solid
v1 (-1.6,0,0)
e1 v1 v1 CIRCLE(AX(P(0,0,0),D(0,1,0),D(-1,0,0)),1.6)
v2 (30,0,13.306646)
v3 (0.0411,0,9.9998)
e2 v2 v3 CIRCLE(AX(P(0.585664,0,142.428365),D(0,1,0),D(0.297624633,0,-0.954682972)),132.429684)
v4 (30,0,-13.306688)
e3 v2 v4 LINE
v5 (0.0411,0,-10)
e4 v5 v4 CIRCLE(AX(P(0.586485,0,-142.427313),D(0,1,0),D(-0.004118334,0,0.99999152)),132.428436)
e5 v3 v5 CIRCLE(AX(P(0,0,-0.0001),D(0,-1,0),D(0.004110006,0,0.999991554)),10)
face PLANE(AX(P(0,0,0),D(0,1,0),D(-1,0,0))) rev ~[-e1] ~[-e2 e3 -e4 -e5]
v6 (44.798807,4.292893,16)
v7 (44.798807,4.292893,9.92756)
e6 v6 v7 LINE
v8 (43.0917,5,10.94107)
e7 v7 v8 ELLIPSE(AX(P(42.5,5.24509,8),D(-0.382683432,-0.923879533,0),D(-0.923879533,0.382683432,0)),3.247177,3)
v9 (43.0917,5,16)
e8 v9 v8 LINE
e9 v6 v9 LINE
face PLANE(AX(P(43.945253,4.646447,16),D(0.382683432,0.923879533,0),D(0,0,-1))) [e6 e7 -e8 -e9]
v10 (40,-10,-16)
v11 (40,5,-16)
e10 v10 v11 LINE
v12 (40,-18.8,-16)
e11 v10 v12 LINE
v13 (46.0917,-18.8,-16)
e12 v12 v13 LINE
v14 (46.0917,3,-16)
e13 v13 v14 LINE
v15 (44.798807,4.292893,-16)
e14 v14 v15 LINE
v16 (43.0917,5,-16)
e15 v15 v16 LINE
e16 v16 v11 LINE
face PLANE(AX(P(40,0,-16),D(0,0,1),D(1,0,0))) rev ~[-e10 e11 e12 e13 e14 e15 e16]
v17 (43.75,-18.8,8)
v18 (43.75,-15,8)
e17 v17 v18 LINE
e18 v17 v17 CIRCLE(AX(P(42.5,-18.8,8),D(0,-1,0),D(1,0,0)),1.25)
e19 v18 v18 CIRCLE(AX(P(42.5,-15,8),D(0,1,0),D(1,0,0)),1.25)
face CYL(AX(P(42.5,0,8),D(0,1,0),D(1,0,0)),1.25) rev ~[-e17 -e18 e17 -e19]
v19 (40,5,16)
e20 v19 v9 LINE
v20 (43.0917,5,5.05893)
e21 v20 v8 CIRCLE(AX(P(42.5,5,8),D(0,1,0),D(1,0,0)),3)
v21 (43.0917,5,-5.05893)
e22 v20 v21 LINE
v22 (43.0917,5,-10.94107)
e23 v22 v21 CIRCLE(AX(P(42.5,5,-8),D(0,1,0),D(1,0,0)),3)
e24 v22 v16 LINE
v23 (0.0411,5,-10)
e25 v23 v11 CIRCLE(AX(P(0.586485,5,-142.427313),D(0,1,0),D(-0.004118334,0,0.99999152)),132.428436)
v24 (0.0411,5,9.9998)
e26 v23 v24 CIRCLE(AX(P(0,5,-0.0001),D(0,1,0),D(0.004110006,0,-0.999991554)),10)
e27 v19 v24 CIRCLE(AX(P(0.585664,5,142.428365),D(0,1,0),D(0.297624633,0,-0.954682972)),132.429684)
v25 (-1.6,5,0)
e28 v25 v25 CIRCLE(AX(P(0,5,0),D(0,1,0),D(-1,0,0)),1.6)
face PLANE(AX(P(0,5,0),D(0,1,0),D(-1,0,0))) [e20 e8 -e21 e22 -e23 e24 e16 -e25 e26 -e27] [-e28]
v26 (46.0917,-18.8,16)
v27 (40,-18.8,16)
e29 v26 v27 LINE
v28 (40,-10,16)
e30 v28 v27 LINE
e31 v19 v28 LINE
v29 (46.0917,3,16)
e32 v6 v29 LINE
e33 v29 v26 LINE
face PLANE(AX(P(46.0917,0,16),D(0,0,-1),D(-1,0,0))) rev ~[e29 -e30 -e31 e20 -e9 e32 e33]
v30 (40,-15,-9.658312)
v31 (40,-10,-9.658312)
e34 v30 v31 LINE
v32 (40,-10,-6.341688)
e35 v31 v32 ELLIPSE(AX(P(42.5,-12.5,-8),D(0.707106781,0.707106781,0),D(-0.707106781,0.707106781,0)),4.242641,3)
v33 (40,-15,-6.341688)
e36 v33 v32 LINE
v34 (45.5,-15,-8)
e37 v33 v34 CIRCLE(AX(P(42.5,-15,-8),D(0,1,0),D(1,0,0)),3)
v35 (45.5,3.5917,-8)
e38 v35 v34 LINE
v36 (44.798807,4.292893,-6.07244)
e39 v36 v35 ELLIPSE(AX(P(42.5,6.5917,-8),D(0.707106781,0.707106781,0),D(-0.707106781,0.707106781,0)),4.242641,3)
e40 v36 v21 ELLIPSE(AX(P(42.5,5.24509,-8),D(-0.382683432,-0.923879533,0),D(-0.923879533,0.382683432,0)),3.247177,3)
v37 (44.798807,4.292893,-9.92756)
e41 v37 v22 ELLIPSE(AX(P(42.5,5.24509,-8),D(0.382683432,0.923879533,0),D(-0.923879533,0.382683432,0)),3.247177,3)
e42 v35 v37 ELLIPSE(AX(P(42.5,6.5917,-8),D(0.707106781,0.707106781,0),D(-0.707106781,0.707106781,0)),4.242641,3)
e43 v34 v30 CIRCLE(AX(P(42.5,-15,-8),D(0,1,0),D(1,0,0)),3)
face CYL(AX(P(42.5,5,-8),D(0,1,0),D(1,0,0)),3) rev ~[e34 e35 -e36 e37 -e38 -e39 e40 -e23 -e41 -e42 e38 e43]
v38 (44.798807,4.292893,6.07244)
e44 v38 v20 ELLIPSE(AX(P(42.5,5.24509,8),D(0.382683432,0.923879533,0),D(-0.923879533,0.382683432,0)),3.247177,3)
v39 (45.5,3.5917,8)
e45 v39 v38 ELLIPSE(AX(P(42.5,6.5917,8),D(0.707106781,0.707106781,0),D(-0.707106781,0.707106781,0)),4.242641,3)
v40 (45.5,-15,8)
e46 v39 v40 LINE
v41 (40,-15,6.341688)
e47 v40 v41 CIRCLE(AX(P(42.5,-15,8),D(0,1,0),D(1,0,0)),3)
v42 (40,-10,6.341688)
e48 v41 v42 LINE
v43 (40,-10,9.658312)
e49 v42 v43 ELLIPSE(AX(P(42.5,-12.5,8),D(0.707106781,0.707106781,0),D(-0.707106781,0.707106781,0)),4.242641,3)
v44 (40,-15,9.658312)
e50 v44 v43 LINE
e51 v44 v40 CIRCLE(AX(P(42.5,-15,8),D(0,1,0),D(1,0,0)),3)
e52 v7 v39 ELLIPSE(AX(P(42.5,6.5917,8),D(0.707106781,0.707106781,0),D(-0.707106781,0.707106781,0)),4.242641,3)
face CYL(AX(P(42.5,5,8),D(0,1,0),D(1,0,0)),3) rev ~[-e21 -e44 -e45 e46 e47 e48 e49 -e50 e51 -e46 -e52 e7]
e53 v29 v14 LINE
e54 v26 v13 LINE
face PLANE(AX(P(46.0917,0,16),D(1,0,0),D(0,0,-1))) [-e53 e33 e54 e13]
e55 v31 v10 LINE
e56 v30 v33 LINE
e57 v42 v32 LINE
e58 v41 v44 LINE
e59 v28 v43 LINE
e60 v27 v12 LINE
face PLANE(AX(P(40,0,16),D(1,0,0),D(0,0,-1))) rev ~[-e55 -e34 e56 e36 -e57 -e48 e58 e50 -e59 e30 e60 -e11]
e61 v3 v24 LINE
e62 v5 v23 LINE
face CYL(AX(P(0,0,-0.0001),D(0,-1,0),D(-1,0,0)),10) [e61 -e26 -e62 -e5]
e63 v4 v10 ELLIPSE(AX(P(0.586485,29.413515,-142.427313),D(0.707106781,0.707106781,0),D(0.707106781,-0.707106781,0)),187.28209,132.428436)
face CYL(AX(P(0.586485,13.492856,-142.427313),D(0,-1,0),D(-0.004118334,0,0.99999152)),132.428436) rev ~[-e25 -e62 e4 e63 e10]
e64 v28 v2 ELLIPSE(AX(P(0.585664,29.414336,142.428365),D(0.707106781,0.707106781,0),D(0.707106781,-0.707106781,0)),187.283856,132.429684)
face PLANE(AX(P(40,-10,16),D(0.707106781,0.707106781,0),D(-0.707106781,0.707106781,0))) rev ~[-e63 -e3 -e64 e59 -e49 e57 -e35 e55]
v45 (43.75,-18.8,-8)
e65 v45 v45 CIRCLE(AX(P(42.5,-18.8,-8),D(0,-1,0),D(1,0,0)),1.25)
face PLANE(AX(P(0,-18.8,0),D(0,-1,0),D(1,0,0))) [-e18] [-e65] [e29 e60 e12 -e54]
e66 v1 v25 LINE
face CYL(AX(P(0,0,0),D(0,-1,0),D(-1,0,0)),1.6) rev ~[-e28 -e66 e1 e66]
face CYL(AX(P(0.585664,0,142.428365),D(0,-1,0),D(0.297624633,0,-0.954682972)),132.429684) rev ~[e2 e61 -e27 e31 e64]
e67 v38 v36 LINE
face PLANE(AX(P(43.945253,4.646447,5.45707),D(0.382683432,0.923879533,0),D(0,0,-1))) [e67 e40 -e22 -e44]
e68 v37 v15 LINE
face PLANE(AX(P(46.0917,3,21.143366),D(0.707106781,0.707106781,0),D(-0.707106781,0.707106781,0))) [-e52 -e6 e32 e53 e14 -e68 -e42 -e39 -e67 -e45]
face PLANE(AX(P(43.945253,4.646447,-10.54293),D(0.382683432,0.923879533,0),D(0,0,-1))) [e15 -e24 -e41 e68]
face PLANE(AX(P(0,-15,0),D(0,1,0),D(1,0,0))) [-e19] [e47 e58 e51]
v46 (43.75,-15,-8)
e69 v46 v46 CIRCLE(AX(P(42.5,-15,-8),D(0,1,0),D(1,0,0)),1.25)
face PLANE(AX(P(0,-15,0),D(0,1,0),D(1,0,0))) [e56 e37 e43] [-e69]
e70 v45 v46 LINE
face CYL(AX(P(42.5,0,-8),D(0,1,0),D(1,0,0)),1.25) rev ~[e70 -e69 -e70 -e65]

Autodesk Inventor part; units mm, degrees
ref_plane "YZ Plane" through (0, 0, 0) normal (1, 0, 0) x (0, 1, 0)
ref_plane "XZ Plane" through (0, 0, 0) normal (0, 1, 0) x (-1, 0, 0)
ref_plane "XY Plane" through (0, 0, 0) normal (0, 0, 1) x (1, 0, 0)
sketch "Эскиз1" plane through (0, 0, 0) normal (0, 1, 0) x (-1, 0, 0)
  circle A0 centre (0, 0) radius 1.6
  circle A1 centre (0, -0.0001) radius 5
  line L0 (-40, -6.3417) -> (-40, 6.3417)
  line L1 (-40, 16) -> (-46.0917, 16)
  line L2 (-46.0917, -16) -> (-40, -16)
  line L3 (-40, -16) -> (-40, -9.6583)
  line L4 (-40, -6.3417) -> (-40, -9.6583)
  line L5 (-40, 9.6583) -> (-40, 6.3417)
  line L6 (-40, 9.6583) -> (-40, 16)
  line L7 (-40, 16) -> (-46.0917, 16)
  line L8 (-46.0917, 16) -> (-46.0917, -16)
  line L9 (-46.0917, -16) -> (-40, -16)
  line L10 (-40, -16) -> (-40, 16)
  circle A2 centre (0, -0.0001) radius 10
  arc A3 (-40, 16) -> (-0.0411, 9.9998) centre (-0.586, 142.4269) ccw
  arc A4 (-0.0411, -10) -> (-40, -16) centre (-0.5865, -142.4271) ccw
  point P0 (0, 0)
  dimension "d0" = 20
  dimension "d1" = 132.4282
  dimension "d2" = 132.4282
extrude "Выдавливание1" add sketch "Эскиз1" along normal blind 5 contours A1 | L4 L3 L2 L8 L1 L6 L5 L0 | L0 L5 L6 A3 A2 A4 L3 L4 | A2
sketch "Эскиз2" plane through (0, 0, 0) normal (0, -1, 0) x (1, 0, 0)
  circle A0 centre (42.5, -8) radius 1.25 projected
  circle A1 centre (0, 0) radius 1.6 projected
  line L0 (46.0917, -16) -> (40, -16) projected
  line L1 (46.0917, 16) -> (46.0917, -16) projected
  line L2 (40, 16) -> (46.0917, 16) projected
  arc A2 (0.0411, 9.9998) -> (40, 16) centre (0.586, 142.4269) ccw projected
  arc A3 (0.0411, 9.9998) -> (0.0411, -10) centre (0, -0.0001) ccw projected
  arc A4 (40, -16) -> (0.0411, -10) centre (0.5865, -142.4271) ccw projected
  circle A5 centre (42.5, 8) radius 1.25 projected
  point P0 (0, 0)
extrude "Выдавливание2" cut sketch "Эскиз2" against normal blind 5 contours A0 | A5
sketch "Эскиз3" plane through (0, 0, 0) normal (0, -1, 0) x (1, 0, 0)
  line L0 (46.0917, 16) -> (46.0917, -16) projected
  arc A0 (40, -16) -> (0.0411, -10) centre (0.5865, -142.4271) ccw projected
  line L1 (46.0917, 16) -> (40, 16)
  line L2 (40, 16) -> (40, -16)
  line L3 (40, -16) -> (46.0917, -16)
  line L4 (46.0917, -16) -> (46.0917, 16)
  circle A1 centre (42.5, 8) radius 1.25 projected
  circle A2 centre (42.5, 8) radius 1.25
  circle A3 centre (42.5, -8) radius 1.25 projected
  circle A4 centre (42.5, -8) radius 1.25
  point P0 (0, 0)
extrude "Выдавливание3" add sketch "Эскиз3" along normal blind 18.8
chamfer "Фаска1" distance 10 angle 45 1 edges at (40, 0, 0)
sketch "Эскиз4" plane through (0, 5, 0) normal (0, 1, 0) x (1, 0, 0)
  circle A0 centre (42.5, -8) radius 1.25 projected
  circle A1 centre (42.5, -8) radius 3
  circle A2 centre (42.5, 8) radius 1.25 projected
  circle A3 centre (42.5, 8) radius 3
  point P0 (0, 0)
  dimension "d12" = 6
  dimension "d13" = 6
extrude "Выдавливание4" cut sketch "Эскиз4" against normal blind 20
chamfer "Фаска2" distance 2 angle 45 1 edges at (46.0917, 5, 0)
chamfer "Фаска3" distance 1 angle 45 3 edges at (44.0917, 5, 0) (44.0917, 5, 13.2715) (44.0917, 5, -13.2715)
equation "\"d2\" = d1"
properties part number "000.403 - Верхний рычаг"
